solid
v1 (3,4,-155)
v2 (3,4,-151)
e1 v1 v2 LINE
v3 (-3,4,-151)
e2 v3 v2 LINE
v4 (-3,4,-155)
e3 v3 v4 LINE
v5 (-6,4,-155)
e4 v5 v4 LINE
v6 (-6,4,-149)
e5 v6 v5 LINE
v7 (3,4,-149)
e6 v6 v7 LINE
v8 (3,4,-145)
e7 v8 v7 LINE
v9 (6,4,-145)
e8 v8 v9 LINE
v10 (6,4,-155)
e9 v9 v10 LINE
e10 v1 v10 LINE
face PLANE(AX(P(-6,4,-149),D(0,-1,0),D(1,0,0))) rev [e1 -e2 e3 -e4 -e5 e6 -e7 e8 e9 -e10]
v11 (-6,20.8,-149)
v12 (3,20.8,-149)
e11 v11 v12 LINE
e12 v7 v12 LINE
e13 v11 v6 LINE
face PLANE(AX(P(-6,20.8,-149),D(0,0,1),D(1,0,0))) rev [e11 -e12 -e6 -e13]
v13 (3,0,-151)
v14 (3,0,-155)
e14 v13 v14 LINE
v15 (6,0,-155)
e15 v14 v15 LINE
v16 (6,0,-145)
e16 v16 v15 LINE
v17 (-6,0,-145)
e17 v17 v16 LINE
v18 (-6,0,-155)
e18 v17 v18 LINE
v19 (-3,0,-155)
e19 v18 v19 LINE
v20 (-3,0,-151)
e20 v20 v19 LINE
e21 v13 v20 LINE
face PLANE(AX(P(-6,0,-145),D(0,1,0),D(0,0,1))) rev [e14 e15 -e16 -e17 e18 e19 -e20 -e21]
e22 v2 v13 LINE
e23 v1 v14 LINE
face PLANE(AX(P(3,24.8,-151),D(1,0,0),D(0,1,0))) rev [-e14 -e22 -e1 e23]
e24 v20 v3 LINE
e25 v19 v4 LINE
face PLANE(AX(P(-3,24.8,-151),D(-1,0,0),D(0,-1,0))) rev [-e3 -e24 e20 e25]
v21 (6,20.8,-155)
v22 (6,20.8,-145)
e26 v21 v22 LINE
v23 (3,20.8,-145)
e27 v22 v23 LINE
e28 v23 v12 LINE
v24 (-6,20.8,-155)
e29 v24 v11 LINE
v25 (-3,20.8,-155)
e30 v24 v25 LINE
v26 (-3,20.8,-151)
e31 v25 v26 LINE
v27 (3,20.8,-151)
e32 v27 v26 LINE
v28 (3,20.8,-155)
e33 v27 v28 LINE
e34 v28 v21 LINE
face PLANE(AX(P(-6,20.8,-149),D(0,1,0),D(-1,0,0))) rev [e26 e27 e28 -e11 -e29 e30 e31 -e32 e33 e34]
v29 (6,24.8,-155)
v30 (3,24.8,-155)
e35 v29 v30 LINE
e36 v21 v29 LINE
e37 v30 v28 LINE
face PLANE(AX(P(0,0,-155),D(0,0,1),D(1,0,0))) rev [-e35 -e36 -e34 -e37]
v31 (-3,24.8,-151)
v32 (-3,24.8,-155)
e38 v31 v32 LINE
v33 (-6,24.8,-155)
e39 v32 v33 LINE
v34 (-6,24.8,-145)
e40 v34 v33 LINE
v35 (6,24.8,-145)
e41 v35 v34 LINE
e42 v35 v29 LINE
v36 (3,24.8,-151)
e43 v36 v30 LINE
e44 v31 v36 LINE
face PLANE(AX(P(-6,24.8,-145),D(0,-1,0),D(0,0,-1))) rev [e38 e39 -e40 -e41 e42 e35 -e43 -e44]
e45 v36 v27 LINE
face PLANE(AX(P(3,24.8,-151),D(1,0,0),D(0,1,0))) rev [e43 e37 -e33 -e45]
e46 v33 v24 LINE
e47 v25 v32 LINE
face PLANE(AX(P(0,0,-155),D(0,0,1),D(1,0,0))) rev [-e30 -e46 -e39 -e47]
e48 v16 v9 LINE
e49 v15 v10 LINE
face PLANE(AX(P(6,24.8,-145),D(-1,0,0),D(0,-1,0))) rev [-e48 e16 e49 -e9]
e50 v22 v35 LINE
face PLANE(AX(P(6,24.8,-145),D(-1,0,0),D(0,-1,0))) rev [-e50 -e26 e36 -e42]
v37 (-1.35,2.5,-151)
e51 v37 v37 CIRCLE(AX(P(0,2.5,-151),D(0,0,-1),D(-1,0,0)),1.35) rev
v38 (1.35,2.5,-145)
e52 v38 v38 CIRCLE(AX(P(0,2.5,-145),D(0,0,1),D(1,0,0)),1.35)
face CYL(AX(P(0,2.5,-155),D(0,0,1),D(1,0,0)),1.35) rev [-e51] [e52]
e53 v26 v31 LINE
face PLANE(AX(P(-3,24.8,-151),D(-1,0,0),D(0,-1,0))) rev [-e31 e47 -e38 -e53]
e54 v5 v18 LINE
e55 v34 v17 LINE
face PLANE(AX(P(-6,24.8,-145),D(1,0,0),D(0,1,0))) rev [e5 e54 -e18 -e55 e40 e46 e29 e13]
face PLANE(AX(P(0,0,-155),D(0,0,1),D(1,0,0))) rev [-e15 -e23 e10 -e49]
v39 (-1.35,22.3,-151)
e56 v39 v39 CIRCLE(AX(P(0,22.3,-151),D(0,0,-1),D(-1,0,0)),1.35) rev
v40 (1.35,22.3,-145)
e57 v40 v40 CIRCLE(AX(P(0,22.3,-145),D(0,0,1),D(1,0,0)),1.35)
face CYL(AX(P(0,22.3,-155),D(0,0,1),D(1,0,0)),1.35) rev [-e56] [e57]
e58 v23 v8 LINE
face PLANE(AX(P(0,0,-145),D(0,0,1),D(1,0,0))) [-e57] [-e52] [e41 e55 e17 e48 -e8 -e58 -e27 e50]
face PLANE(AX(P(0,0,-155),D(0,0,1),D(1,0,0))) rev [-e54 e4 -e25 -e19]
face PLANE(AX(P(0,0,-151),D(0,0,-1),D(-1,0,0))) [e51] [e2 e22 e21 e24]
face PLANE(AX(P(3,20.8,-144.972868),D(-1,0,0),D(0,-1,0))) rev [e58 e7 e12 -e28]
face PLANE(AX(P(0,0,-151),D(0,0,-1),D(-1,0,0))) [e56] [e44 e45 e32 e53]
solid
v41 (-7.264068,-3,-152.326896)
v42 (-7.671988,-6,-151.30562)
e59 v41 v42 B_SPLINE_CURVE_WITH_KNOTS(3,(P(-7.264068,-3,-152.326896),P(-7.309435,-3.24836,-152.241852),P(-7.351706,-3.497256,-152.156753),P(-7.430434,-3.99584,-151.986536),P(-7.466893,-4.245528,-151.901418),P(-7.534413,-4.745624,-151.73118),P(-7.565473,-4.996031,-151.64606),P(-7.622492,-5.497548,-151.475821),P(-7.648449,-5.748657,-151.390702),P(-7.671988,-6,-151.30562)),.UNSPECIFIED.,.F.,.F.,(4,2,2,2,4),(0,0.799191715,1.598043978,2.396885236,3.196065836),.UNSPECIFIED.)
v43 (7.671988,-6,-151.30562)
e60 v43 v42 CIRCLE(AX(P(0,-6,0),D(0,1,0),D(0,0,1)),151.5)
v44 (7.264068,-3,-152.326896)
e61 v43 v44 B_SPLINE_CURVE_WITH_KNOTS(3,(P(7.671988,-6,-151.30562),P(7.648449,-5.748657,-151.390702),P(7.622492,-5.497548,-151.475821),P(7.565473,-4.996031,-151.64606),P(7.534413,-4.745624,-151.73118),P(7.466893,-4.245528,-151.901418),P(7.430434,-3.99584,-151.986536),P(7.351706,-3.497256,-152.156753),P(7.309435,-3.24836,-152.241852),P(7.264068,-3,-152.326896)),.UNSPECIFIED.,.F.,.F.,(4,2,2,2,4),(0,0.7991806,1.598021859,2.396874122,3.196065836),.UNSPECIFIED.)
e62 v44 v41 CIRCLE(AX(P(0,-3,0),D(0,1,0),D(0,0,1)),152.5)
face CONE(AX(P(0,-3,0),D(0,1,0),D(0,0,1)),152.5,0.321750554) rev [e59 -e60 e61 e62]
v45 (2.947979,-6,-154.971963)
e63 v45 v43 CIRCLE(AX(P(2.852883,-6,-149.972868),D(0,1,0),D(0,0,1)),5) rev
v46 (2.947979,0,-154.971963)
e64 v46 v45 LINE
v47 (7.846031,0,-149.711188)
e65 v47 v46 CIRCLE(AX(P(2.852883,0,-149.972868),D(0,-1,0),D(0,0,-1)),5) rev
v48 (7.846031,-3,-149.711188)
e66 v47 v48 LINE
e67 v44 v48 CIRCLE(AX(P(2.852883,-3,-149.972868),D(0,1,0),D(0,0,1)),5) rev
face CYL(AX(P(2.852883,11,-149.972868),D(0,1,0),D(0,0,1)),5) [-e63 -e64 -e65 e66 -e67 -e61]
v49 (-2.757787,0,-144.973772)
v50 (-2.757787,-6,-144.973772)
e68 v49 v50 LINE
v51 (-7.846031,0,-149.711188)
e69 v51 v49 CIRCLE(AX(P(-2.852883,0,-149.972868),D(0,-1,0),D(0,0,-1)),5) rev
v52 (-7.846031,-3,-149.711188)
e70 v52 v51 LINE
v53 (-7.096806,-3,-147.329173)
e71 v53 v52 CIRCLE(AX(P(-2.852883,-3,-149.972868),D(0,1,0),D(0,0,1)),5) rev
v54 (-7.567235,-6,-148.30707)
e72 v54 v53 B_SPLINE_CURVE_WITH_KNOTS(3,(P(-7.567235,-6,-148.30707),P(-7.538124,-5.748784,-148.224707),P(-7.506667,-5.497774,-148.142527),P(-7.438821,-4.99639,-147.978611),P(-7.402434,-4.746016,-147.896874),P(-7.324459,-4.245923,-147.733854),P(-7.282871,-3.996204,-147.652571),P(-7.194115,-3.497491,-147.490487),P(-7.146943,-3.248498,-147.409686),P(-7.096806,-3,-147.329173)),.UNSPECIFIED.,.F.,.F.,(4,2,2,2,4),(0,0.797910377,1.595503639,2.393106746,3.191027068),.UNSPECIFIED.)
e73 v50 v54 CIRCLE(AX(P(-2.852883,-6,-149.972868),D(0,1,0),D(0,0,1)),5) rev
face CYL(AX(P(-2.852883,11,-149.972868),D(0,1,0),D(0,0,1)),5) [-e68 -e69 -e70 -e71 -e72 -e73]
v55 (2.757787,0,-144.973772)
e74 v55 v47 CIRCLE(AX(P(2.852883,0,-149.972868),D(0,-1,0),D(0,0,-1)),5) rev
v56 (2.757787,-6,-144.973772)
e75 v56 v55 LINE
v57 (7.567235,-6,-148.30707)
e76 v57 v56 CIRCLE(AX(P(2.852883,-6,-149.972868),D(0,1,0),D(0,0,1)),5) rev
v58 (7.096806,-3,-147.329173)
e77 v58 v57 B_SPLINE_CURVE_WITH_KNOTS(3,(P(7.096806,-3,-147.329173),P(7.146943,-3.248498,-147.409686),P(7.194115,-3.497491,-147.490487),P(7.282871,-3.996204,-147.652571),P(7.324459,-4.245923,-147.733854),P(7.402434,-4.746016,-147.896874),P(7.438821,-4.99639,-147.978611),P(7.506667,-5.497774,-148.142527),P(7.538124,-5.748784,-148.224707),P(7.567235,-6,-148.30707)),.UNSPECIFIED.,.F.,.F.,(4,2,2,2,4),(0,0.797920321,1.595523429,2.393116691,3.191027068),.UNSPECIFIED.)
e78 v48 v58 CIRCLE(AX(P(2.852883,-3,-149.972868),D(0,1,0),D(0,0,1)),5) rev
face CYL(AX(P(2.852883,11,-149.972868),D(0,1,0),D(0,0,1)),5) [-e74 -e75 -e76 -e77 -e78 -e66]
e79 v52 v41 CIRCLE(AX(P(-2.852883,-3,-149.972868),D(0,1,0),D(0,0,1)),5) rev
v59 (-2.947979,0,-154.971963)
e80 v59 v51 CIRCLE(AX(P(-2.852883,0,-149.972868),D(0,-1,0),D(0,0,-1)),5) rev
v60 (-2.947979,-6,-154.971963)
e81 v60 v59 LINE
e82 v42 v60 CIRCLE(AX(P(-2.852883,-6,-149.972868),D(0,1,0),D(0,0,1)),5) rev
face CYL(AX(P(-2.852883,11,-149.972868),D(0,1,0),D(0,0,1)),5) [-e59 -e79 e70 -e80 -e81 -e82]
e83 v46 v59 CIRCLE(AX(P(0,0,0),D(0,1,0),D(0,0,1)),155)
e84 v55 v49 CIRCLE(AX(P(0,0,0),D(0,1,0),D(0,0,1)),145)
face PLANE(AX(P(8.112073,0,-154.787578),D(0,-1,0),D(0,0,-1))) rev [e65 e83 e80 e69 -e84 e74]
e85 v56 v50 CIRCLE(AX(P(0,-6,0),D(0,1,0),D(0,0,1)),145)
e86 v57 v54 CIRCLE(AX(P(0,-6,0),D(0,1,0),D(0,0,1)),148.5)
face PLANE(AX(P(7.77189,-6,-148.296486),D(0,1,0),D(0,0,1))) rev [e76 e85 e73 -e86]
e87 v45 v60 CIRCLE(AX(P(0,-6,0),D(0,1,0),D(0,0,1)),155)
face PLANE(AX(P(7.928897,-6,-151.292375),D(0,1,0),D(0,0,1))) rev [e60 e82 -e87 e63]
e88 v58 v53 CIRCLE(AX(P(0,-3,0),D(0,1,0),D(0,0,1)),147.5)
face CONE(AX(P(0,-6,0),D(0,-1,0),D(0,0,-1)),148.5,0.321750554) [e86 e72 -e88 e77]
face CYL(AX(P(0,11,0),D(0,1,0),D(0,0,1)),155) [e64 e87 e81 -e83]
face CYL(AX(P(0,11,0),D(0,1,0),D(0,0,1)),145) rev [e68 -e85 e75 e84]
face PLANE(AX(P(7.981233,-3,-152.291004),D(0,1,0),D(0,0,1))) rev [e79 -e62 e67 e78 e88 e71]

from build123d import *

# Parameters (mm, degrees)
SKETCH7_W          = 12
SKETCH7_H          = 24.8
MAIN_DEPTH         = 5
SKETCH8_R          = 1.35
HOLES_DEPTH        = 28.405109013
SKETCH16_W         = 6
SKETCH16_H         = 16.8
FIXEXTRUSION_DEPTH = 158.429476274
SUPPORT_ANGLE      = 6
FILLET1_R          = 5
SKETCH17_W         = 6
SKETCH17_H         = 24.8
CUT_EXTRUDE1_DEPTH = 4
SKETCH18_W         = 3
SKETCH18_H         = 16.8
CUT_EXTRUDE2_DEPTH = 27.696588907


with BuildPart() as part:
    # Sketch7 → Main (new, symmetric)
    with BuildSketch(Plane.XY.offset(-150)):
        with Locations((0, 12.4)):
            Rectangle(SKETCH7_W, SKETCH7_H)
    extrude(amount=MAIN_DEPTH, both=True)

    # Sketch8 → Holes (cut, through all)
    with BuildSketch(Plane.XY.offset(-145)):
        with Locations((0, 22.3)):
            Circle(SKETCH8_R)
        with Locations((0, 2.5)):
            Circle(SKETCH8_R)
    extrude(amount=-HOLES_DEPTH, mode=Mode.SUBTRACT)

    # Sketch16 → FixExtrusion (cut, through all)
    with BuildSketch(Plane(origin=(6, 0, 0), x_dir=(0, 0, -1), z_dir=(1, 0, 0))):
        with Locations((152, 12.4)):
            Rectangle(SKETCH16_W, SKETCH16_H)
    extrude(amount=-FIXEXTRUSION_DEPTH, mode=Mode.SUBTRACT)

    # Sketch17 → Cut-Extrude1 (cut)
    with BuildSketch(Plane(origin=(0, 0, -155), x_dir=(-1, 0, 0), z_dir=(0, 0, -1))):
        with Locations((0, 12.4)):
            Rectangle(SKETCH17_W, SKETCH17_H)
    extrude(amount=-CUT_EXTRUDE1_DEPTH, mode=Mode.SUBTRACT)

    # Sketch18 → Cut-Extrude2 (cut, through all)
    with BuildSketch(Plane(origin=(0, 0, -149), x_dir=(-1, 0, 0), z_dir=(0, 0, -1))):
        with Locations((-4.5, 12.4)):
            Rectangle(SKETCH18_W, SKETCH18_H)
    extrude(amount=-CUT_EXTRUDE2_DEPTH, mode=Mode.SUBTRACT)


with BuildPart() as body_2:
    # Sketch10 → Support (revolve, symmetric)
    with BuildSketch(Plane(origin=(0, 0, 0), x_dir=(0, 0, -1), z_dir=(1, 0, 0))) as support_sk:
        Polygon((152.5, -3), (147.5, -3), (148.5, -6), (145, -6), (145, 0), (155, 0), (155, -6), (151.5, -6), align=None)
    revolve(axis=Axis((0, 11, 0), (0, -1, 0)), revolution_arc=SUPPORT_ANGLE / 2)
    revolve(support_sk.sketch, axis=Axis((0, 11, 0), (0, 1, 0)), revolution_arc=SUPPORT_ANGLE / 2)

    # Fillet1
    fillet1_edges = [body_2.edges().sort_by_distance(p)[0] for p in [
        (8.112073218, -3, -154.787577887),
        (-8.112073218, -3, -154.787577887),
        (7.588713655, -3, -144.801282539),
        (-7.588713655, -3, -144.801282539),
    ]]
    fillet(fillet1_edges, radius=FILLET1_R - 0.0001)  # a hair under: the kernel refuses the full size


solid = Compound([part.part, body_2.part])
